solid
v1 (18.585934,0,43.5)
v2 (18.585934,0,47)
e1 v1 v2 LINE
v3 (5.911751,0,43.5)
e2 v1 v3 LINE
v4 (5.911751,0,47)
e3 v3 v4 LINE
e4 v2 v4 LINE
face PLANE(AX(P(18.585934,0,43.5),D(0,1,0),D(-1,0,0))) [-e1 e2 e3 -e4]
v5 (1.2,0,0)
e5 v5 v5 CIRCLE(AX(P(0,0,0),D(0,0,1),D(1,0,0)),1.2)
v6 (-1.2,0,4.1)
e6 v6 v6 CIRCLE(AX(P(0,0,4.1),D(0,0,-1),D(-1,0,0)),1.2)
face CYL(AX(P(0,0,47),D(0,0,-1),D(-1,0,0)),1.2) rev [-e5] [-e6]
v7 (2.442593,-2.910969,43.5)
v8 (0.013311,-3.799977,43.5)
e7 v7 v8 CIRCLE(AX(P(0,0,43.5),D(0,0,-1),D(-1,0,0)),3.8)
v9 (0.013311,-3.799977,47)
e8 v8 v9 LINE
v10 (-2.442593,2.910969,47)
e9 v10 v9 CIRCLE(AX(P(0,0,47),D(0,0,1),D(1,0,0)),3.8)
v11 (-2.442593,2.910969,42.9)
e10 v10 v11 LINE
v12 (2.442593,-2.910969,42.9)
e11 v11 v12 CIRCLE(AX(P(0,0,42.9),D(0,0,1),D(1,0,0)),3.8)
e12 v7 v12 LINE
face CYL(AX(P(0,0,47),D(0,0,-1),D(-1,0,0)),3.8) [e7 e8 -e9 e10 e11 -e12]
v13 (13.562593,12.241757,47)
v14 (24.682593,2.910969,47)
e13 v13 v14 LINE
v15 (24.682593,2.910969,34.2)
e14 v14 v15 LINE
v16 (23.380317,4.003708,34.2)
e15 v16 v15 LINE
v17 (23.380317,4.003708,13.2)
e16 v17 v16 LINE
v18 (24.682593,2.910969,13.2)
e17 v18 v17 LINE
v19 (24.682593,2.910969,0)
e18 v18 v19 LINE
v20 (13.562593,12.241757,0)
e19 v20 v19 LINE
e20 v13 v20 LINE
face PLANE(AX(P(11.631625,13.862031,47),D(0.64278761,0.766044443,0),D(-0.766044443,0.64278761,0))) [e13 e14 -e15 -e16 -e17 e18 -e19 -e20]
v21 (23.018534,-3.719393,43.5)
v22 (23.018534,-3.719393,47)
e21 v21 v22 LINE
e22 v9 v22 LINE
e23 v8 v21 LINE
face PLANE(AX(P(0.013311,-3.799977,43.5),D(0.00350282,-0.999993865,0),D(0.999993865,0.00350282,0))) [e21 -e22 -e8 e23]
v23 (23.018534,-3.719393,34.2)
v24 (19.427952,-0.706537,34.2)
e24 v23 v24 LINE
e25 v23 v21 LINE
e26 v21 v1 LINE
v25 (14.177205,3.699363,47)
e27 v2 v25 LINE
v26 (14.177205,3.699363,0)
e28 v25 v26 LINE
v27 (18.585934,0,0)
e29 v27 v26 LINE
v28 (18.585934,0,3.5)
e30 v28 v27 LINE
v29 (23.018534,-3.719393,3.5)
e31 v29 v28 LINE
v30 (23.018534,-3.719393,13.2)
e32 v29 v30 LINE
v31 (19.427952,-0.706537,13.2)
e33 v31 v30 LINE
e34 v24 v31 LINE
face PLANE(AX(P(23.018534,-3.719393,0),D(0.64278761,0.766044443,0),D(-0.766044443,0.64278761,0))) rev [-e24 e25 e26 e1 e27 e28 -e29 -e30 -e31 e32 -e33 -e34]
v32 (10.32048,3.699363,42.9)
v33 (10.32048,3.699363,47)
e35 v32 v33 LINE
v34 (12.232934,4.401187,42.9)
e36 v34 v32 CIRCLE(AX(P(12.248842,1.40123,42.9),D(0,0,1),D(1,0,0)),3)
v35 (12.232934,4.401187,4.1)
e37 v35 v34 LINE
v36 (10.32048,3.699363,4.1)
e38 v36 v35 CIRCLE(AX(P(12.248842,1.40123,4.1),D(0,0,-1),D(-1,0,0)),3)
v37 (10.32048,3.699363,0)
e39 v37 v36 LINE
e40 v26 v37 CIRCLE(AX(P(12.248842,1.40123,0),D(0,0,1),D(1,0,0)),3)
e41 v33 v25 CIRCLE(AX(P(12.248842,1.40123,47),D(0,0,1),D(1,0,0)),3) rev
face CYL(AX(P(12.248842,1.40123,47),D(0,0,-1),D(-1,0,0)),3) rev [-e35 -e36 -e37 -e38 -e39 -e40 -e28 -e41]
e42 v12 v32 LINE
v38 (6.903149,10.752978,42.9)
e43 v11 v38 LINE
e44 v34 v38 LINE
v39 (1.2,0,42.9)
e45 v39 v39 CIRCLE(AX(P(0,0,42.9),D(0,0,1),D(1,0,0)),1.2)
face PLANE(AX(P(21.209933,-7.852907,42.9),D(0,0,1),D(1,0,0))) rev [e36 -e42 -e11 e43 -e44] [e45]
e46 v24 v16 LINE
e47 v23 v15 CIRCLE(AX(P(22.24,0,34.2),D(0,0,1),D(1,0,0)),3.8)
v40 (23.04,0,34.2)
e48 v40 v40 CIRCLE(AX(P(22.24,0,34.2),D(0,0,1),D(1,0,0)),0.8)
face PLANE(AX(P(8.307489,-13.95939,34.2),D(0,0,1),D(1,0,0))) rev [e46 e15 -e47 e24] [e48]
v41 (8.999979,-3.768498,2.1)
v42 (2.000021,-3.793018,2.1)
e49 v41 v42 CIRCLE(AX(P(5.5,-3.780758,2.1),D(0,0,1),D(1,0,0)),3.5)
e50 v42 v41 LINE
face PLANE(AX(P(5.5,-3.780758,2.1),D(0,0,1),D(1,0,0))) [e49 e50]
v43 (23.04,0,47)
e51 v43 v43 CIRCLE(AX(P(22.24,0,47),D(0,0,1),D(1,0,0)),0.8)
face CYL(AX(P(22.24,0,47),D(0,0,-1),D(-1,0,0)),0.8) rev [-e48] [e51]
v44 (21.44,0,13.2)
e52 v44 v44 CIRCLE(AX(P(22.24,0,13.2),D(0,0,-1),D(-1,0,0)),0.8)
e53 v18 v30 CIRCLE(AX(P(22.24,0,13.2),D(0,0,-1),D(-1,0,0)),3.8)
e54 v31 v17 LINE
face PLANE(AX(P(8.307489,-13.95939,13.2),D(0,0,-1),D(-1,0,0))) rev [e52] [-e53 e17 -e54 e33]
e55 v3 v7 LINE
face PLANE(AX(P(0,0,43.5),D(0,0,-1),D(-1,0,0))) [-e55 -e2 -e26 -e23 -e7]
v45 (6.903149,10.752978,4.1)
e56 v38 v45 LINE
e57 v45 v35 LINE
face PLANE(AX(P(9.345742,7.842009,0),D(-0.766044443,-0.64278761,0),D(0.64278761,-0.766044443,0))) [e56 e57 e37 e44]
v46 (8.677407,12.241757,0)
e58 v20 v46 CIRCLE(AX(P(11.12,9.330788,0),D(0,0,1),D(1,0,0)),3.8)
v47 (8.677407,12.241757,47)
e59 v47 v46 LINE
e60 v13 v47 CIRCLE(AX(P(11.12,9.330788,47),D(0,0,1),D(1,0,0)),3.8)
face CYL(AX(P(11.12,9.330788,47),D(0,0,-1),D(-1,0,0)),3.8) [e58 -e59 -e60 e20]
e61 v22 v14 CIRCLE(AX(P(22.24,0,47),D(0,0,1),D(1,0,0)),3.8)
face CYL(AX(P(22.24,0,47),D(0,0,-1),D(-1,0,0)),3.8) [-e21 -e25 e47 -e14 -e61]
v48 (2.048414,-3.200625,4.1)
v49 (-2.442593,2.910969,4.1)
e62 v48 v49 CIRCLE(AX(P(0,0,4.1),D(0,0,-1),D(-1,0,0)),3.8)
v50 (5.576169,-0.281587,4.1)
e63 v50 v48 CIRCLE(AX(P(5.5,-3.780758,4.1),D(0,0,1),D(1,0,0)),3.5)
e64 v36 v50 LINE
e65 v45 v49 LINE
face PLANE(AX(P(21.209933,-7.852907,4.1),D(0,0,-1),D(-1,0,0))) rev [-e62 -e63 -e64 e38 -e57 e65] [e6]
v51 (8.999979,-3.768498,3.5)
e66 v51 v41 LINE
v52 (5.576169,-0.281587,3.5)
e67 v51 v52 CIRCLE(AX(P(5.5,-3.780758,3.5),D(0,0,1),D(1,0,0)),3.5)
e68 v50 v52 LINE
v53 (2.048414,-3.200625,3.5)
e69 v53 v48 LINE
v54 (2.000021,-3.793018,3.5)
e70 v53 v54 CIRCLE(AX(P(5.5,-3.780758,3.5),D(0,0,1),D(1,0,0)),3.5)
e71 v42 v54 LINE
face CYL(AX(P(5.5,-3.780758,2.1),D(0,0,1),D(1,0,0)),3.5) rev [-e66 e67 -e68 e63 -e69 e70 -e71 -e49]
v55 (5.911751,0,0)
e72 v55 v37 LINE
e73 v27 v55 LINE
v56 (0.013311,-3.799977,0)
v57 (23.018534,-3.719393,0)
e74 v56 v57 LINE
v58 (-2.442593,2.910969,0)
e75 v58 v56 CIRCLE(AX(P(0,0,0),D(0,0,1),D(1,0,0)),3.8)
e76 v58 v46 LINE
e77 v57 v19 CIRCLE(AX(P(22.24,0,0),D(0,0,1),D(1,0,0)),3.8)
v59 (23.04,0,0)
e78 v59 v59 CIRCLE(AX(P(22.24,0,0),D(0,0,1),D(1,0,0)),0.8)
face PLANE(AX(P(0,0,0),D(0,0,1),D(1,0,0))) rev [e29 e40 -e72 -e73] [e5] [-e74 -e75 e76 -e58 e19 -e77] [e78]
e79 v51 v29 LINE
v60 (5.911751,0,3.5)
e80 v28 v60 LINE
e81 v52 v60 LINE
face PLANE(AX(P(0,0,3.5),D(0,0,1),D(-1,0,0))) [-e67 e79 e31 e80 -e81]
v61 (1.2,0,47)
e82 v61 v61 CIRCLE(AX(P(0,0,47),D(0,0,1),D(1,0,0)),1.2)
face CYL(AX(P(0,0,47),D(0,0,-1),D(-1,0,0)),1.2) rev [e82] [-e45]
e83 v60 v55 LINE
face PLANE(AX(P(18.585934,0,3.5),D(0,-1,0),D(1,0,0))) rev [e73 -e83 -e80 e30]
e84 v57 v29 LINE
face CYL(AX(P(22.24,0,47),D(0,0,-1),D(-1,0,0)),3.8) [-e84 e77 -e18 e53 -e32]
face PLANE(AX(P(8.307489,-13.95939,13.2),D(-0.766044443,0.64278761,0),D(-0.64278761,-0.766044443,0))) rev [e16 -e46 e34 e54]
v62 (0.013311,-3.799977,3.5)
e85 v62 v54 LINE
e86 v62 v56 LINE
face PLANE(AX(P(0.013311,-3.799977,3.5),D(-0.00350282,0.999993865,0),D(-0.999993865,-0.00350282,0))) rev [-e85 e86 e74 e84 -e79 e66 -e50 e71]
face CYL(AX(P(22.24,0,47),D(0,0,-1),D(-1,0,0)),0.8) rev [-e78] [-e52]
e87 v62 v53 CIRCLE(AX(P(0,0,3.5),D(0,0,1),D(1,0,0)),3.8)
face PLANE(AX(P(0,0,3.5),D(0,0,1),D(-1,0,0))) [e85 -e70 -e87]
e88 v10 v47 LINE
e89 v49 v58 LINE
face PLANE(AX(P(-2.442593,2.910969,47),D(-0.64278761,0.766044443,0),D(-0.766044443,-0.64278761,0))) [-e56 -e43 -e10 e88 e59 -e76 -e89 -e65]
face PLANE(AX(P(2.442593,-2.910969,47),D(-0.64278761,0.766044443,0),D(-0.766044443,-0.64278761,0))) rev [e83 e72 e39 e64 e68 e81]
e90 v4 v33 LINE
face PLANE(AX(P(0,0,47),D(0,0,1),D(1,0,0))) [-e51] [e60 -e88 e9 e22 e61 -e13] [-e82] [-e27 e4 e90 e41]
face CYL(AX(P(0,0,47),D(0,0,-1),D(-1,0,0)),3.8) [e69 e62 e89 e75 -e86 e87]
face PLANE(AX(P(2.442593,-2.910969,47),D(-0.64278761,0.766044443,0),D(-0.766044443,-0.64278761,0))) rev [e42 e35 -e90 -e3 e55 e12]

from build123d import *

# Parameters (mm, degrees)
SKETCH_1_R          = 1.2
SKETCH_1_R_2        = 0.8
EXTRUDE_3_DEPTH     = 47
SKETCH_6_W          = 5.5
SKETCH_6_H          = 21
CUT_EXTRUDE_4_DEPTH = 53.526968295
SKETCH_7_W          = 15
SKETCH_7_H          = 38.8
CUT_EXTRUDE_5_DEPTH = 56.899041136
CUT_EXTRUDE_6_DEPTH = 56.31273986
CUT_EXTRUDE_7_DEPTH = 56.31273986
SKETCH_10_W         = 38.8
SKETCH_10_H         = 7.6
CUT_EXTRUDE_8_DEPTH = 1
EXTRUDE_4_DEPTH     = 3.5
FILLET_1_R          = 3
SKETCH_12_R         = 3.5
CUT_EXTRUDE_9_DEPTH = 2


with BuildPart() as part:
    # 草图1 → 凸台-拉伸3 (new body)
    with BuildSketch(Plane.XY):
        with BuildLine():
            Line((8.677407083, 12.241756783), (-2.442592917, 2.910968884))
            ThreePointArc((-2.442592917, 2.910968884), (-2.910968884, -2.442592917), (2.442592917, -2.910968884))
            Line((2.442592917, -2.910968884), (11.12, 4.370240199))
            Line((11.12, 4.370240199), (19.797407083, -2.910968884))
            ThreePointArc((19.797407083, -2.910968884), (25.150968884, -2.442592917), (24.682592917, 2.910968884))
            Line((24.682592917, 2.910968884), (13.562592917, 12.241756783))
            ThreePointArc((13.562592917, 12.241756783), (11.12, 13.130787899), (8.677407083, 12.241756783))
        make_face()
        Circle(SKETCH_1_R, mode=Mode.SUBTRACT)
        with Locations((22.24, 0)):
            Circle(SKETCH_1_R_2, mode=Mode.SUBTRACT)
    extrude(amount=EXTRUDE_3_DEPTH)

    # 草图6 → 切除-拉伸4 (cut, through all)
    with BuildSketch(Plane(origin=(11.631625181, 13.862031097, 0), x_dir=(0.7660444431189771, -0.6427876096865404, 0), z_dir=(0.6427876096865404, 0.7660444431189771, 0))):
        with Locations((18.086828415, -23.7)):
            Rectangle(SKETCH_6_W, SKETCH_6_H)
    extrude(amount=-CUT_EXTRUDE_4_DEPTH, mode=Mode.SUBTRACT)

    # 草图7 → 切除-拉伸5 (cut, through all)
    with BuildSketch(Plane(origin=(-2.442592917, 2.910968884, 0), x_dir=(0.766044443118977, 0.6427876096865407, 0), z_dir=(-0.6427876096865407, 0.766044443118977, 0))):
        with Locations((3.7, -23.5)):
            Rectangle(SKETCH_7_W, SKETCH_7_H)
    extrude(amount=-CUT_EXTRUDE_5_DEPTH, mode=Mode.SUBTRACT)

    # 草图8 → 切除-拉伸6 (cut, through all)
    with BuildSketch(Plane.XY.offset(47)):
        with BuildLine():
            Line((19.03136264, -2.268181274), (23.018534178, -3.719393033))
            ThreePointArc((23.018534178, -3.719393033), (21.314980934, -3.685693928), (19.797407083, -2.910968884))
            Line((19.797407083, -2.910968884), (19.03136264, -2.268181274))
        make_face()
    extrude(amount=-CUT_EXTRUDE_6_DEPTH, mode=Mode.SUBTRACT)

    # 草图9 → 切除-拉伸7 (cut, through all)
    with BuildSketch(Plane.XY.offset(47)):
        Polygon((23.018534178, -3.719393033), (12.248842355, 5.317451403), (11.12, 4.370240199), (19.03136264, -2.268181274), align=None)
    extrude(amount=-CUT_EXTRUDE_7_DEPTH, mode=Mode.SUBTRACT)

    # 草图10 → 切除-拉伸8 (cut)
    with BuildSketch(Plane(origin=(8.579697763, 7.199221228, 0), x_dir=(0, 0, 1), z_dir=(-0.7660444431189769, -0.6427876096865407, 0))):
        with Locations((23.5, 0)):
            Rectangle(SKETCH_10_W, SKETCH_10_H)
    extrude(amount=-CUT_EXTRUDE_8_DEPTH, mode=Mode.SUBTRACT)

    # 草图11 → 凸台-拉伸4 (add)
    with BuildSketch(Plane.XY.offset(47)):
        Polygon((0.013310717, -3.799976687), (23.018534178, -3.719393033), (18.585934169, 0), (5.911750542, 0), align=None)
    extrude_4 = extrude(amount=-EXTRUDE_4_DEPTH)

    # 镜向2: 凸台-拉伸4 across plane
    add(extrude_4.mirror(Plane(origin=(0, 0, 23.5), x_dir=(1, 0, 0), z_dir=(0, 0, -1))))

    # 圆角1
    # the kernel refuses this fillet: 3 mm, written as the material it adds along each edge
    with BuildSketch(Plane(origin=(12.248842355, 5.317451403, 47), x_dir=(0.7660444431189768, -0.6427876096865407, 0), z_dir=(0, 0, -1))) as fillet_1_piece_1_section:
        with BuildLine():
            CenterArc((FILLET_1_R * 0.839099631177, FILLET_1_R), FILLET_1_R, 190, 80)
            Line((-FILLET_1_R * 0.145708121835, FILLET_1_R * 0.826351822333), (0, 0))
            Line((0, 0), (FILLET_1_R * 0.839099631177, 0))
        make_face()
    fillet_1_piece_1 = extrude(amount=47, mode=Mode.PRIVATE)
    fillet_1_piece_1 = split(fillet_1_piece_1, bisect_by=Plane(origin=(12.660529152, 4.67576924, 42.9), z_dir=(0, 0, 1)), keep=Keep.TOP, mode=Mode.PRIVATE)
    fillet_1_piece_1 = split(fillet_1_piece_1, bisect_by=Plane(origin=(12.274400975, 4.351769229, 44.95), z_dir=(0.7660444431189769, 0.6427876096865407, 0)), keep=Keep.TOP, mode=Mode.PRIVATE)
    add(fillet_1_piece_1)
    with BuildSketch(Plane(origin=(12.248842355, 5.317451403, 47), x_dir=(0.7660444431189768, -0.6427876096865407, 0), z_dir=(0, 0, -1))) as fillet_1_piece_2_section:
        with BuildLine():
            CenterArc((FILLET_1_R * 0.839099631177, FILLET_1_R), FILLET_1_R, 190, 80)
            Line((-FILLET_1_R * 0.145708121835, FILLET_1_R * 0.826351822333), (0, 0))
            Line((0, 0), (FILLET_1_R * 0.839099631177, 0))
        make_face()
    fillet_1_piece_2 = extrude(amount=47, mode=Mode.PRIVATE)
    fillet_1_piece_2 = split(fillet_1_piece_2, bisect_by=Plane(origin=(11.44751572, 4.445896391, 42.9), z_dir=(0, 0, 1)), keep=Keep.TOP, mode=Mode.PRIVATE)
    fillet_1_piece_2 = split(fillet_1_piece_2, bisect_by=Plane(origin=(11.886403327, 4.81416682, 44.95), z_dir=(-0.7660444431189769, -0.6427876096865407, 0)), keep=Keep.TOP, mode=Mode.PRIVATE)
    add(fillet_1_piece_2)
    with BuildSketch(Plane(origin=(12.248842355, 5.317451403, 47), x_dir=(0.7660444431189768, -0.6427876096865407, 0), z_dir=(0, 0, -1))) as fillet_1_piece_3_section:
        with BuildLine():
            CenterArc((FILLET_1_R * 0.839099631177, FILLET_1_R), FILLET_1_R, 190, 80)
            Line((-FILLET_1_R * 0.145708121835, FILLET_1_R * 0.826351822333), (0, 0))
            Line((0, 0), (FILLET_1_R * 0.839099631177, 0))
        make_face()
    fillet_1_piece_3 = extrude(amount=47, mode=Mode.PRIVATE)
    fillet_1_piece_3 = split(fillet_1_piece_3, bisect_by=Plane(origin=(12.660529152, 4.67576924, 42.9), z_dir=(0, 0, -1)), keep=Keep.TOP, mode=Mode.PRIVATE)
    fillet_1_piece_3 = split(fillet_1_piece_3, bisect_by=Plane(origin=(12.274400975, 4.351769229, 23.5), z_dir=(0.7660444431189769, 0.6427876096865407, 0)), keep=Keep.TOP, mode=Mode.PRIVATE)
    fillet_1_piece_3 = split(fillet_1_piece_3, bisect_by=Plane(origin=(12.660529152, 4.67576924, 4.1), z_dir=(0, 0, 1)), keep=Keep.TOP, mode=Mode.PRIVATE)
    add(fillet_1_piece_3)
    with BuildSketch(Plane(origin=(12.248842355, 5.317451403, 47), x_dir=(0.7660444431189768, -0.6427876096865407, 0), z_dir=(0, 0, -1))) as fillet_1_piece_4_section:
        with BuildLine():
            CenterArc((FILLET_1_R * 0.839099631177, FILLET_1_R), FILLET_1_R, 190, 80)
            Line((-FILLET_1_R * 0.145708121835, FILLET_1_R * 0.826351822333), (0, 0))
            Line((0, 0), (FILLET_1_R * 0.839099631177, 0))
        make_face()
    fillet_1_piece_4 = extrude(amount=47, mode=Mode.PRIVATE)
    fillet_1_piece_4 = split(fillet_1_piece_4, bisect_by=Plane(origin=(12.274400975, 4.351769229, 2.05), z_dir=(0.7660444431189769, 0.6427876096865407, 0)), keep=Keep.TOP, mode=Mode.PRIVATE)
    fillet_1_piece_4 = split(fillet_1_piece_4, bisect_by=Plane(origin=(12.660529152, 4.67576924, 4.1), z_dir=(0, 0, -1)), keep=Keep.TOP, mode=Mode.PRIVATE)
    add(fillet_1_piece_4)
    with BuildSketch(Plane(origin=(12.248842355, 5.317451403, 47), x_dir=(0.7660444431189768, -0.6427876096865407, 0), z_dir=(0, 0, -1))) as fillet_1_piece_5_section:
        with BuildLine():
            CenterArc((FILLET_1_R * 0.839099631177, FILLET_1_R), FILLET_1_R, 190, 80)
            Line((-FILLET_1_R * 0.145708121835, FILLET_1_R * 0.826351822333), (0, 0))
            Line((0, 0), (FILLET_1_R * 0.839099631177, 0))
        make_face()
    fillet_1_piece_5 = extrude(amount=47, mode=Mode.PRIVATE)
    fillet_1_piece_5 = split(fillet_1_piece_5, bisect_by=Plane(origin=(11.886403327, 4.81416682, 2.05), z_dir=(-0.7660444431189769, -0.6427876096865407, 0)), keep=Keep.TOP, mode=Mode.PRIVATE)
    fillet_1_piece_5 = split(fillet_1_piece_5, bisect_by=Plane(origin=(11.44751572, 4.445896391, 4.1), z_dir=(0, 0, -1)), keep=Keep.TOP, mode=Mode.PRIVATE)
    add(fillet_1_piece_5)

    # 草图12 → 切除-拉伸9 (cut)
    with BuildSketch(Plane.XY.offset(4.1)):
        with Locations((5.5, -3.780757684)):
            Circle(SKETCH_12_R)
    extrude(amount=-CUT_EXTRUDE_9_DEPTH, mode=Mode.SUBTRACT)


solid = part.part
